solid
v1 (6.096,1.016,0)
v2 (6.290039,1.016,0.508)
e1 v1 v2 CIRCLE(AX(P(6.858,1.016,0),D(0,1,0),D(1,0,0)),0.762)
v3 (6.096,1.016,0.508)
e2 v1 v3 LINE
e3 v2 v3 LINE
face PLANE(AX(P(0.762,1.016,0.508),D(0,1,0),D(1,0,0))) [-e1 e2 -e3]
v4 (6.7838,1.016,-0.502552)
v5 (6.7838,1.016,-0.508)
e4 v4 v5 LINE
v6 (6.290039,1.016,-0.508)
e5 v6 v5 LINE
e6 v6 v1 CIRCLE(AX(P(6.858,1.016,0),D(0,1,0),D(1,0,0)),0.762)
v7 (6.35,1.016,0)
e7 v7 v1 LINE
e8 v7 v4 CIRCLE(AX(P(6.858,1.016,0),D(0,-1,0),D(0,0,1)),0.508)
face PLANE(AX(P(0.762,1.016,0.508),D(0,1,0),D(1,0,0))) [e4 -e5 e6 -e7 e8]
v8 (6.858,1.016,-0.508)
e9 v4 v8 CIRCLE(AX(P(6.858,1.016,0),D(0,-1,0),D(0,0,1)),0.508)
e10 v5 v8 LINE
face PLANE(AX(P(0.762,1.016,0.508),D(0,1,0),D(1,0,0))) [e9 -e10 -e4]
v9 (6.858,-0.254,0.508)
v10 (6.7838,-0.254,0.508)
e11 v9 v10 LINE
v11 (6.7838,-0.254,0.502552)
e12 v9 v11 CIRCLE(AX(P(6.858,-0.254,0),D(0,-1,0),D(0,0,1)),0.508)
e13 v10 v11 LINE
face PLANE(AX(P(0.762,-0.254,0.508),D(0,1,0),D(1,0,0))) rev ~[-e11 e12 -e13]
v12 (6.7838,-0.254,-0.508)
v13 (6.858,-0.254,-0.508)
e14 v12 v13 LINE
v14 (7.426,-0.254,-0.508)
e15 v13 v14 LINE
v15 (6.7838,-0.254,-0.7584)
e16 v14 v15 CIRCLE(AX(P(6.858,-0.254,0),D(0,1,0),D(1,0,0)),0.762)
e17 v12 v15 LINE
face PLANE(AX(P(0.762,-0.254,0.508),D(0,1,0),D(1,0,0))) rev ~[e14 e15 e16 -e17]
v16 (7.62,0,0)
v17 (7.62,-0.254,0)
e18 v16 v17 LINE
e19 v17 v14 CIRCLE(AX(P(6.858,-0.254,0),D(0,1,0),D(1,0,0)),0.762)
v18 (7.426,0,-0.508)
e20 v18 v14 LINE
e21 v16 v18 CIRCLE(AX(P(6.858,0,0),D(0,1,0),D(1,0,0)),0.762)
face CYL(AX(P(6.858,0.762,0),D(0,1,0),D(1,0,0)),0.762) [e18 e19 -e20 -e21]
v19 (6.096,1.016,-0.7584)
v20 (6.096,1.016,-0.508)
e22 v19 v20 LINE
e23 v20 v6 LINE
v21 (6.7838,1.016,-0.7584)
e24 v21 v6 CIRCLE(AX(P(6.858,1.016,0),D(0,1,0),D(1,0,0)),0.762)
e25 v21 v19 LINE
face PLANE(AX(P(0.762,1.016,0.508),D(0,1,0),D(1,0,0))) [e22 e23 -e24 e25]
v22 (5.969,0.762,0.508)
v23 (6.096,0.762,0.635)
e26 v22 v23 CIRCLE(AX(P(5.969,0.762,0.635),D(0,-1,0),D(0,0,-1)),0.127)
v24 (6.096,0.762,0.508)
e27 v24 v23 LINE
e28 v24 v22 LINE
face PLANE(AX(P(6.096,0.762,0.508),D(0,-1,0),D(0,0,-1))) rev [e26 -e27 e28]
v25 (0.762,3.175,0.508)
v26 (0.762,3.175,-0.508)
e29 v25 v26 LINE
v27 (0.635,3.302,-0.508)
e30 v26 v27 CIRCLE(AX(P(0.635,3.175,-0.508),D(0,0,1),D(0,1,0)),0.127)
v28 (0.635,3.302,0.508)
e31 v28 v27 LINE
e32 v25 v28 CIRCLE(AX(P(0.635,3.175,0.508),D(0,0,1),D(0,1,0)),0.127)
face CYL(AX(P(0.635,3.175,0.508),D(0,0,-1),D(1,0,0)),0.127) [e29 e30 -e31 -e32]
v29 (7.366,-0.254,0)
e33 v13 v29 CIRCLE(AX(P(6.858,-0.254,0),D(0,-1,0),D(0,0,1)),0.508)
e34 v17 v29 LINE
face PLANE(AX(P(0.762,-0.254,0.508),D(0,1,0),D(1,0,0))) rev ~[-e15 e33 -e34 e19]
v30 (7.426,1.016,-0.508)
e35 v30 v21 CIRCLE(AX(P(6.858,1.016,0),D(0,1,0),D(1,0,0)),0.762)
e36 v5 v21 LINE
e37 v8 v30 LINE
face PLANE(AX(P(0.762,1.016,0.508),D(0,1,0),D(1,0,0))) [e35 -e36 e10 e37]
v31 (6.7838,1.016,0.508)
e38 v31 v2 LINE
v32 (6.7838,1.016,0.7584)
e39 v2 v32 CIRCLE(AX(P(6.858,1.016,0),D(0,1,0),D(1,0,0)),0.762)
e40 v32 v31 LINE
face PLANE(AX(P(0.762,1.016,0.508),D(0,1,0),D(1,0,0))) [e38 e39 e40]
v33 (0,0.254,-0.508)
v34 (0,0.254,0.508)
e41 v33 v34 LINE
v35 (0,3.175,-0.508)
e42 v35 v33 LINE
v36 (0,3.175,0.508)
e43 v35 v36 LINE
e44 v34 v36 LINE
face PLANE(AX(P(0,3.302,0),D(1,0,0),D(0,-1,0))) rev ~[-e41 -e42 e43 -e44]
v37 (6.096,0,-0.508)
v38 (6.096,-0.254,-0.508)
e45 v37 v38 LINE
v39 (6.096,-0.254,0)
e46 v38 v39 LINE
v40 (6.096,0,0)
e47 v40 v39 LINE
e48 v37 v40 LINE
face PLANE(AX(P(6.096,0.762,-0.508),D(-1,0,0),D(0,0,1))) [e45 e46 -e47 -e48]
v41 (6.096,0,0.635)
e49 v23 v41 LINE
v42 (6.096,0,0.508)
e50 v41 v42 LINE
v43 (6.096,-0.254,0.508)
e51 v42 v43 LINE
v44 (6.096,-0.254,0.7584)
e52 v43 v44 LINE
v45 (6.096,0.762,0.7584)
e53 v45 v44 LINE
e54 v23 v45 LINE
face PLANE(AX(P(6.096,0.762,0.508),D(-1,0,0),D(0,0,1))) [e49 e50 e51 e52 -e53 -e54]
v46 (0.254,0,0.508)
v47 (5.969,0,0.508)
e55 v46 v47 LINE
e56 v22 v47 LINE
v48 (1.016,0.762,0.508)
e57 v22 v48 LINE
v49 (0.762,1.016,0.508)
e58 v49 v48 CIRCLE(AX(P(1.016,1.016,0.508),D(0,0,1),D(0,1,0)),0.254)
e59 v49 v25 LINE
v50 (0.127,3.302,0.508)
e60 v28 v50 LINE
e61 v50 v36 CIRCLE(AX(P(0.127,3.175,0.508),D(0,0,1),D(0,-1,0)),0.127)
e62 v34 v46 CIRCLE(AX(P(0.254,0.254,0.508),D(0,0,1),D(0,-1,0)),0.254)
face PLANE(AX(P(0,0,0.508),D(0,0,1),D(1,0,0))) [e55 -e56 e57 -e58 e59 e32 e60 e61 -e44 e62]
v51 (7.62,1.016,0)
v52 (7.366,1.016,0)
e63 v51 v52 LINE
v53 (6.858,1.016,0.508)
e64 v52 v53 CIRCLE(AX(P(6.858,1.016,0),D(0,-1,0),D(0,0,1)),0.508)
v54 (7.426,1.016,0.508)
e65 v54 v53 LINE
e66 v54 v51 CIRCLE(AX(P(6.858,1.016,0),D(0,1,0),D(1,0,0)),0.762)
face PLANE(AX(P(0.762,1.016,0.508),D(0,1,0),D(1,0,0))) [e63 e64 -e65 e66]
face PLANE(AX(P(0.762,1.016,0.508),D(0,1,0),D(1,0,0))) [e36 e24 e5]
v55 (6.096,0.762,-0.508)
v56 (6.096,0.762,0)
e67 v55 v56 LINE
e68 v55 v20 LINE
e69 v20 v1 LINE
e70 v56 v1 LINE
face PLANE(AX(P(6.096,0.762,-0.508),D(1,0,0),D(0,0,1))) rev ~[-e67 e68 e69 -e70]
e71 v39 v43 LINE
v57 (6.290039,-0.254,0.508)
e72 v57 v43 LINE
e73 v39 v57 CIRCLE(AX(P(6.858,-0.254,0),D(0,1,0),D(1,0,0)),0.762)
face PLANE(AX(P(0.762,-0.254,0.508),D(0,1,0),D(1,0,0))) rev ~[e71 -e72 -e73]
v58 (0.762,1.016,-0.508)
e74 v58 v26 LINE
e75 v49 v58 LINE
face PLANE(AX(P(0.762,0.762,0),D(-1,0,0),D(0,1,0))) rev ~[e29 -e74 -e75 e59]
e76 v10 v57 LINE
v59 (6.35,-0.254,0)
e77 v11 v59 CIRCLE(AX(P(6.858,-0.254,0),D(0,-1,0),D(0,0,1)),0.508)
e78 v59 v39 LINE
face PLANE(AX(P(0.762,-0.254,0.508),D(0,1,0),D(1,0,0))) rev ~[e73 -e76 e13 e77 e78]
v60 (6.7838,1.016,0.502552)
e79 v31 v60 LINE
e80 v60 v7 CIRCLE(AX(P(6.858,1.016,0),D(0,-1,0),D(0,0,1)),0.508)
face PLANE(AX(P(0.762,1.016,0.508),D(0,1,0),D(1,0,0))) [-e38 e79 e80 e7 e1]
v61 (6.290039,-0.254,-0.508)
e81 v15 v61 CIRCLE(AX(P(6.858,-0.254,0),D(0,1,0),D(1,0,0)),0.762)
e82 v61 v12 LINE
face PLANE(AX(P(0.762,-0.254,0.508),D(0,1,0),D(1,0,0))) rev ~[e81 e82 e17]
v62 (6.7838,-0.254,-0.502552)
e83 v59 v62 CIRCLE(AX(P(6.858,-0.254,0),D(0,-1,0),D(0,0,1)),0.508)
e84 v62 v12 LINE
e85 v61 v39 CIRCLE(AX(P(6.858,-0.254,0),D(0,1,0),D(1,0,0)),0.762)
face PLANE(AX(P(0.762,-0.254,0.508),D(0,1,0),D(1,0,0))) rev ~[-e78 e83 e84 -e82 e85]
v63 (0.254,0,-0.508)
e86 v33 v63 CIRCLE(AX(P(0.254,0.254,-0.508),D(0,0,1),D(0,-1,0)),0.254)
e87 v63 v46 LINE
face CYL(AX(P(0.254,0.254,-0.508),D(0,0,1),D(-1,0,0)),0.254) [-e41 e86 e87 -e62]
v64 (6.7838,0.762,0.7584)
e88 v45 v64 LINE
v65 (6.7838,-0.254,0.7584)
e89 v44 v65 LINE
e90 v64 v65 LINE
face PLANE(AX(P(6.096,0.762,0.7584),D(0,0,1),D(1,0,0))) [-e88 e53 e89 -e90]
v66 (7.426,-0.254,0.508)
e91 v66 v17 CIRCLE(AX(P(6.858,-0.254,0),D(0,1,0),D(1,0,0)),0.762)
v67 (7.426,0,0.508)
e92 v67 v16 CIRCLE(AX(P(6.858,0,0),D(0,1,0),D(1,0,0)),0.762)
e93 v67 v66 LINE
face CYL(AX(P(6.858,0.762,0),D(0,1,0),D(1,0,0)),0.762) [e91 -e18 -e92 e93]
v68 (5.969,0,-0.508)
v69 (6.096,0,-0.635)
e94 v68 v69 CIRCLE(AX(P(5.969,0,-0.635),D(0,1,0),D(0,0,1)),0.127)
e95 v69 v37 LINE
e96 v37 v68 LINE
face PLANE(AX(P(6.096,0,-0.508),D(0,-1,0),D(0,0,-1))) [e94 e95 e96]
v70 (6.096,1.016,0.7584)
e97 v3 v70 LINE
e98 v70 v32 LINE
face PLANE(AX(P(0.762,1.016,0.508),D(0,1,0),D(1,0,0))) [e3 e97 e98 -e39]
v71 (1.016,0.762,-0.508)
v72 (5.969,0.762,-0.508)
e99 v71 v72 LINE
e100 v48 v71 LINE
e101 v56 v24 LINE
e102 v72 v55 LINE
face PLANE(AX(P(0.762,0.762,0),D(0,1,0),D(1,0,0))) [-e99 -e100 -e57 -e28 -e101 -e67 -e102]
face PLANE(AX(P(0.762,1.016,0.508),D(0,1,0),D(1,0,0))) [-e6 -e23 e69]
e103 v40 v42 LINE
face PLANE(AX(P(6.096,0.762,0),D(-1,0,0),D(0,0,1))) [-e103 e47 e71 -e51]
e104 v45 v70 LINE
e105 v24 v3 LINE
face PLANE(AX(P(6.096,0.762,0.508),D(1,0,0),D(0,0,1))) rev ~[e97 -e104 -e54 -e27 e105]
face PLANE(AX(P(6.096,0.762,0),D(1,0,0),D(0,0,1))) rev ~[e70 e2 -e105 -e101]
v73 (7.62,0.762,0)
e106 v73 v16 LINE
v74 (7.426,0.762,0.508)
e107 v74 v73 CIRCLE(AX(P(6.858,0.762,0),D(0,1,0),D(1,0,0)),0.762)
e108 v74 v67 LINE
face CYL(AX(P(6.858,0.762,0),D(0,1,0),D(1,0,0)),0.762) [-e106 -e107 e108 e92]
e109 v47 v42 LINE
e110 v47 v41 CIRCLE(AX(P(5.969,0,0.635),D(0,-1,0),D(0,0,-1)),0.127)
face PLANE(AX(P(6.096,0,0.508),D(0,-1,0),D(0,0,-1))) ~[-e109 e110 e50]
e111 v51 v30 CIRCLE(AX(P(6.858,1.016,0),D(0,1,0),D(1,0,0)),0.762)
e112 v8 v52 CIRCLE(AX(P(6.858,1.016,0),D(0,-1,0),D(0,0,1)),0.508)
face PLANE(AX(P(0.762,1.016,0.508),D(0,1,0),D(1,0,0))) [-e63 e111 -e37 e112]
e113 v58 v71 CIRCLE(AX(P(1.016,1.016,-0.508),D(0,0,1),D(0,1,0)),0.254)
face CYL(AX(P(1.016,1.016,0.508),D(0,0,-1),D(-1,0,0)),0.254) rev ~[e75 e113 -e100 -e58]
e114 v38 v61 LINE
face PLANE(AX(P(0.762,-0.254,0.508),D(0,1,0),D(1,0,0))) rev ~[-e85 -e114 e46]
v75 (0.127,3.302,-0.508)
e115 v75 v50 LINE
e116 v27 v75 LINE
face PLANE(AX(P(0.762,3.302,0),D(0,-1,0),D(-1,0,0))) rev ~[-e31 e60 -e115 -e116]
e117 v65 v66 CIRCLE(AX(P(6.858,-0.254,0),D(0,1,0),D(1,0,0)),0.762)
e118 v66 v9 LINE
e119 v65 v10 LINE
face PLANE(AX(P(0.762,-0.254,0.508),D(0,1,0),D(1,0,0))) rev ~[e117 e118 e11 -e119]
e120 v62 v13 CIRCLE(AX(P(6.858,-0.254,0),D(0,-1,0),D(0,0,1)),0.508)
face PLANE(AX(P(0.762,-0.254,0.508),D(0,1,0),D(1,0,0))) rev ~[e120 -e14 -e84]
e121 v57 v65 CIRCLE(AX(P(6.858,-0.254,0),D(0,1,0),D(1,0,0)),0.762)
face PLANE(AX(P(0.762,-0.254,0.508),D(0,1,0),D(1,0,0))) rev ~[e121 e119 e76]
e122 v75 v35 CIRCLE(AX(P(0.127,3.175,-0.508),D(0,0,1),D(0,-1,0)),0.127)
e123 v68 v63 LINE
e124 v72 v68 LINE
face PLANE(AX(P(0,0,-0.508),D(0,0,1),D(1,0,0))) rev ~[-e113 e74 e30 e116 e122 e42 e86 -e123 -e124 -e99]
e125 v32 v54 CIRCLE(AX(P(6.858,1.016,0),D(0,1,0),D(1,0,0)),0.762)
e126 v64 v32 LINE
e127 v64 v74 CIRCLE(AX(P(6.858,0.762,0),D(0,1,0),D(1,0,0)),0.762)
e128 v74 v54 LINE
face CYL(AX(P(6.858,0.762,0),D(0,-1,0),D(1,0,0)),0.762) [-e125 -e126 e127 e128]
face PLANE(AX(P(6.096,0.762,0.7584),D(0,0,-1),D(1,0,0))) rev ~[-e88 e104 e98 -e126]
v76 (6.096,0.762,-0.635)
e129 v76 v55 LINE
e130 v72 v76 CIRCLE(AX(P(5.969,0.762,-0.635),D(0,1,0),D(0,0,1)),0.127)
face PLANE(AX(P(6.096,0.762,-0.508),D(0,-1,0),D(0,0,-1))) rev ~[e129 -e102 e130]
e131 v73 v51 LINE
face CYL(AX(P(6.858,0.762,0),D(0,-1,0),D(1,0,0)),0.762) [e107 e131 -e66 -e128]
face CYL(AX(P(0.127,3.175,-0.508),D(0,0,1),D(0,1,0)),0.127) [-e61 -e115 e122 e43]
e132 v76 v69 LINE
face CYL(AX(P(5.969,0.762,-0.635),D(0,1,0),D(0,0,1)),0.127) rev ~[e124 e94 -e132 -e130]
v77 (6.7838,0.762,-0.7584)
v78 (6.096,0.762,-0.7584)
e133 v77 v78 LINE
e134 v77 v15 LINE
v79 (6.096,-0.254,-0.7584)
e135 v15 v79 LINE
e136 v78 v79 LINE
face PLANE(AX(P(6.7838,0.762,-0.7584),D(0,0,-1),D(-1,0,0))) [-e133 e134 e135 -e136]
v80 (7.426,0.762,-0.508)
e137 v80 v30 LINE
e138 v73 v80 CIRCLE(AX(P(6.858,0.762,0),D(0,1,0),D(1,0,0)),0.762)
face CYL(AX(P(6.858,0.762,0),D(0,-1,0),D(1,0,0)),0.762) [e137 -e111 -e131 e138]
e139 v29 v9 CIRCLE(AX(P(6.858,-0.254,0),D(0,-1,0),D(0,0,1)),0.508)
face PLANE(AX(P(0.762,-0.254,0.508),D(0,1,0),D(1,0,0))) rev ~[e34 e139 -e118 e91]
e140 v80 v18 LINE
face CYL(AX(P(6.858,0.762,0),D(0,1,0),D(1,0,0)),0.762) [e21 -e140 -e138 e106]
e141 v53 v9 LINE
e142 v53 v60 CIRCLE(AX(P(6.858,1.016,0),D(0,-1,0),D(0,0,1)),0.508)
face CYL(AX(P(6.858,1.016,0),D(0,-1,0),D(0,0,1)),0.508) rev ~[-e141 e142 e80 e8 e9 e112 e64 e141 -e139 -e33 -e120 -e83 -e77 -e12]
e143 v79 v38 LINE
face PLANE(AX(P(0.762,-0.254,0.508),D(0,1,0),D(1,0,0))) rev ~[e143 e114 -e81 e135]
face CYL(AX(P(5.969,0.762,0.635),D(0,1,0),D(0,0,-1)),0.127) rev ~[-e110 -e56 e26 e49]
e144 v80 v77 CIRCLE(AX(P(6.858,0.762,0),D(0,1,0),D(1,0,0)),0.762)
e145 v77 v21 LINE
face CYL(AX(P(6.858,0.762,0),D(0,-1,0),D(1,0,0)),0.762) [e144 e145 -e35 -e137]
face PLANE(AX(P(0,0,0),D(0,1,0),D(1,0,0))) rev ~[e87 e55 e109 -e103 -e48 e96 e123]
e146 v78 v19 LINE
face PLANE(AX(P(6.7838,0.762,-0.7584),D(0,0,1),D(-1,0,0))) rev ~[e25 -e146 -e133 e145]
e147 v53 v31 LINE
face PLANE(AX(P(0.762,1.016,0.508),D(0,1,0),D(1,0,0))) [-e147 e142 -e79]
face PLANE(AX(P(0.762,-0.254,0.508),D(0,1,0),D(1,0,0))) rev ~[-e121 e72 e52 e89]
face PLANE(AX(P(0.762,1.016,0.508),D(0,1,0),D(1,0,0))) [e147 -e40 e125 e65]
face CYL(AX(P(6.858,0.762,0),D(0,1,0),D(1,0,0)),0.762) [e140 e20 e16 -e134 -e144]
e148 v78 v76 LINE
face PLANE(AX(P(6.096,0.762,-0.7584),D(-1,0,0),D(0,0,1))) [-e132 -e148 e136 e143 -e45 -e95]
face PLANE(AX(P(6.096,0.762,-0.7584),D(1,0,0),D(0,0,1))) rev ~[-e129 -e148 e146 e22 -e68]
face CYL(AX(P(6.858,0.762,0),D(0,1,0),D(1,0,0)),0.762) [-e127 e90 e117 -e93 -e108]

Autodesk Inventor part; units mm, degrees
ref_plane "YZ Plane" through (0, 0, 0) normal (1, 0, 0) x (0, 1, 0)
ref_plane "XZ Plane" through (0, 0, 0) normal (0, 1, 0) x (-1, 0, 0)
ref_plane "XY Plane" through (0, 0, 0) normal (0, 0, 1) x (1, 0, 0)
sketch "Sketch1" plane through (0, 0, 0) normal (0, 0, 1) x (1, 0, 0)
  line L0 (0, 4.0132) -> (0, -0.9652) projected
  line L1 (-1.524, 0) -> (9.144, 0) projected
  line L2 (7.62, 0) -> (0, 0)
  line L3 (0, 0) -> (0, 0.762)
  line L4 (0, 0.762) -> (7.62, 0.762)
  line L5 (7.62, 0.762) -> (7.62, 0)
  line L6 (0, 0.762) -> (0.762, 0.762)
  line L7 (0.762, 0.762) -> (0.762, 3.302)
  line L8 (0.762, 3.302) -> (0, 3.302)
  line L9 (0, 3.302) -> (0, 0.762)
  line L10 (6.096, -0.254) -> (7.62, -0.254)
  line L11 (7.62, -0.254) -> (7.62, 1.016)
  line L12 (7.62, 1.016) -> (6.096, 1.016)
  line L13 (6.096, 1.016) -> (6.096, -0.254)
  line L14 (6.096, -0.254) -> (7.62, 1.016) construction
  line L15 (7.62, -0.254) -> (6.096, 1.016) construction
  line L16 (0, 0.381) -> (7.62, 0.381) construction
  point P0 (6.858, 0.381)
  dimension "d0" = 0.762
  dimension "d1" = 0.762
  dimension "d2" = 3.302
  dimension "d4" = 1.27
  dimension "d5" = 1.524
  dimension "d6" = 6.858
  dimension "d7" = 0
extrude "Extrusion1" add sketch "Sketch1" along normal mid plane 1.016 contours L8 L7 L4 L0 | L4 L13 L1 L0 | L13 L4 L5 L1
sketch "Sketch2" plane through (0.762, 0.762, 0.508) normal (0, 1, 0) x (1, 0, 0)
  line L0 (-0.762, 1.5748) -> (-0.762, -0.5588) projected
  line L1 (8.382, 0.508) -> (-2.286, 0.508) projected
  line L2 (6.858, 1.016) -> (6.858, 0) projected
  circle A0 centre (6.096, 0.508) radius 0.762
  line L3 (0, 1.016) -> (6.858, 1.016) projected
  line L4 (6.858, 0) -> (0, 0) projected
  line L5 (6.664, 0) -> (6.858, 0)
  line L6 (6.858, 0) -> (6.858, 1.016)
  line L7 (6.858, 1.016) -> (6.664, 1.016)
  line L8 (5.334, -0.2504) -> (6.0218, -0.2504)
  line L9 (6.0218, -0.2504) -> (6.0218, 1.2664)
  line L10 (6.0218, 1.2664) -> (5.334, 1.2664)
  line L11 (5.334, 1.2664) -> (5.334, -0.2504)
  line L12 (5.334, -0.2504) -> (6.0218, 1.2664) construction
  line L13 (6.0218, -0.2504) -> (5.334, 1.2664) construction
  point P0 (-0.762, 0.508)
  point P1 (5.6779, 0.508)
  dimension "d10" = 1.524
  dimension "d30" = 6.096
extrude "Extrusion2" add sketch "Sketch2" against normal blind 1.016 and the other way blind 0.254 contours A0 L4 L9 L1 | L1 L9 L3 A0 | L9 L4 A0 L1 | L1 A0 L3 L9 | L3 L9 A0 | A0 L9 L4 | L11 L3 A0 | A0 L4 L11 | L9 A0 L4 | L3 A0 L9 | A0 L3 L11 L10 | L8 L11 L4 A0
extrude "Extrusion3" cut sketch "Sketch2" against normal up to next contours A0 L3 L2 | L2 L4 A0
hole "Hole1" at (6.858, 1.016, 0) direction (0, -1, 0) diameter 1.016 end through all
fillet "Fillet2" radius 0.254 2 edges at (0.762, 0.762, 0) (0, 0, 0)
fillet "Fillet3" radius 0.127 2 edges at (6.096, 0.381, 0.508) (6.096, 0.381, -0.508)
fillet "Fillet4" radius 0.127 2 edges at (0, 3.302, 0) (0.762, 3.302, 0)
properties part number "J007870 GRIN LENS HOLDER 1MM DIA Rev -" material "STAINLESS STEEL, 316"
